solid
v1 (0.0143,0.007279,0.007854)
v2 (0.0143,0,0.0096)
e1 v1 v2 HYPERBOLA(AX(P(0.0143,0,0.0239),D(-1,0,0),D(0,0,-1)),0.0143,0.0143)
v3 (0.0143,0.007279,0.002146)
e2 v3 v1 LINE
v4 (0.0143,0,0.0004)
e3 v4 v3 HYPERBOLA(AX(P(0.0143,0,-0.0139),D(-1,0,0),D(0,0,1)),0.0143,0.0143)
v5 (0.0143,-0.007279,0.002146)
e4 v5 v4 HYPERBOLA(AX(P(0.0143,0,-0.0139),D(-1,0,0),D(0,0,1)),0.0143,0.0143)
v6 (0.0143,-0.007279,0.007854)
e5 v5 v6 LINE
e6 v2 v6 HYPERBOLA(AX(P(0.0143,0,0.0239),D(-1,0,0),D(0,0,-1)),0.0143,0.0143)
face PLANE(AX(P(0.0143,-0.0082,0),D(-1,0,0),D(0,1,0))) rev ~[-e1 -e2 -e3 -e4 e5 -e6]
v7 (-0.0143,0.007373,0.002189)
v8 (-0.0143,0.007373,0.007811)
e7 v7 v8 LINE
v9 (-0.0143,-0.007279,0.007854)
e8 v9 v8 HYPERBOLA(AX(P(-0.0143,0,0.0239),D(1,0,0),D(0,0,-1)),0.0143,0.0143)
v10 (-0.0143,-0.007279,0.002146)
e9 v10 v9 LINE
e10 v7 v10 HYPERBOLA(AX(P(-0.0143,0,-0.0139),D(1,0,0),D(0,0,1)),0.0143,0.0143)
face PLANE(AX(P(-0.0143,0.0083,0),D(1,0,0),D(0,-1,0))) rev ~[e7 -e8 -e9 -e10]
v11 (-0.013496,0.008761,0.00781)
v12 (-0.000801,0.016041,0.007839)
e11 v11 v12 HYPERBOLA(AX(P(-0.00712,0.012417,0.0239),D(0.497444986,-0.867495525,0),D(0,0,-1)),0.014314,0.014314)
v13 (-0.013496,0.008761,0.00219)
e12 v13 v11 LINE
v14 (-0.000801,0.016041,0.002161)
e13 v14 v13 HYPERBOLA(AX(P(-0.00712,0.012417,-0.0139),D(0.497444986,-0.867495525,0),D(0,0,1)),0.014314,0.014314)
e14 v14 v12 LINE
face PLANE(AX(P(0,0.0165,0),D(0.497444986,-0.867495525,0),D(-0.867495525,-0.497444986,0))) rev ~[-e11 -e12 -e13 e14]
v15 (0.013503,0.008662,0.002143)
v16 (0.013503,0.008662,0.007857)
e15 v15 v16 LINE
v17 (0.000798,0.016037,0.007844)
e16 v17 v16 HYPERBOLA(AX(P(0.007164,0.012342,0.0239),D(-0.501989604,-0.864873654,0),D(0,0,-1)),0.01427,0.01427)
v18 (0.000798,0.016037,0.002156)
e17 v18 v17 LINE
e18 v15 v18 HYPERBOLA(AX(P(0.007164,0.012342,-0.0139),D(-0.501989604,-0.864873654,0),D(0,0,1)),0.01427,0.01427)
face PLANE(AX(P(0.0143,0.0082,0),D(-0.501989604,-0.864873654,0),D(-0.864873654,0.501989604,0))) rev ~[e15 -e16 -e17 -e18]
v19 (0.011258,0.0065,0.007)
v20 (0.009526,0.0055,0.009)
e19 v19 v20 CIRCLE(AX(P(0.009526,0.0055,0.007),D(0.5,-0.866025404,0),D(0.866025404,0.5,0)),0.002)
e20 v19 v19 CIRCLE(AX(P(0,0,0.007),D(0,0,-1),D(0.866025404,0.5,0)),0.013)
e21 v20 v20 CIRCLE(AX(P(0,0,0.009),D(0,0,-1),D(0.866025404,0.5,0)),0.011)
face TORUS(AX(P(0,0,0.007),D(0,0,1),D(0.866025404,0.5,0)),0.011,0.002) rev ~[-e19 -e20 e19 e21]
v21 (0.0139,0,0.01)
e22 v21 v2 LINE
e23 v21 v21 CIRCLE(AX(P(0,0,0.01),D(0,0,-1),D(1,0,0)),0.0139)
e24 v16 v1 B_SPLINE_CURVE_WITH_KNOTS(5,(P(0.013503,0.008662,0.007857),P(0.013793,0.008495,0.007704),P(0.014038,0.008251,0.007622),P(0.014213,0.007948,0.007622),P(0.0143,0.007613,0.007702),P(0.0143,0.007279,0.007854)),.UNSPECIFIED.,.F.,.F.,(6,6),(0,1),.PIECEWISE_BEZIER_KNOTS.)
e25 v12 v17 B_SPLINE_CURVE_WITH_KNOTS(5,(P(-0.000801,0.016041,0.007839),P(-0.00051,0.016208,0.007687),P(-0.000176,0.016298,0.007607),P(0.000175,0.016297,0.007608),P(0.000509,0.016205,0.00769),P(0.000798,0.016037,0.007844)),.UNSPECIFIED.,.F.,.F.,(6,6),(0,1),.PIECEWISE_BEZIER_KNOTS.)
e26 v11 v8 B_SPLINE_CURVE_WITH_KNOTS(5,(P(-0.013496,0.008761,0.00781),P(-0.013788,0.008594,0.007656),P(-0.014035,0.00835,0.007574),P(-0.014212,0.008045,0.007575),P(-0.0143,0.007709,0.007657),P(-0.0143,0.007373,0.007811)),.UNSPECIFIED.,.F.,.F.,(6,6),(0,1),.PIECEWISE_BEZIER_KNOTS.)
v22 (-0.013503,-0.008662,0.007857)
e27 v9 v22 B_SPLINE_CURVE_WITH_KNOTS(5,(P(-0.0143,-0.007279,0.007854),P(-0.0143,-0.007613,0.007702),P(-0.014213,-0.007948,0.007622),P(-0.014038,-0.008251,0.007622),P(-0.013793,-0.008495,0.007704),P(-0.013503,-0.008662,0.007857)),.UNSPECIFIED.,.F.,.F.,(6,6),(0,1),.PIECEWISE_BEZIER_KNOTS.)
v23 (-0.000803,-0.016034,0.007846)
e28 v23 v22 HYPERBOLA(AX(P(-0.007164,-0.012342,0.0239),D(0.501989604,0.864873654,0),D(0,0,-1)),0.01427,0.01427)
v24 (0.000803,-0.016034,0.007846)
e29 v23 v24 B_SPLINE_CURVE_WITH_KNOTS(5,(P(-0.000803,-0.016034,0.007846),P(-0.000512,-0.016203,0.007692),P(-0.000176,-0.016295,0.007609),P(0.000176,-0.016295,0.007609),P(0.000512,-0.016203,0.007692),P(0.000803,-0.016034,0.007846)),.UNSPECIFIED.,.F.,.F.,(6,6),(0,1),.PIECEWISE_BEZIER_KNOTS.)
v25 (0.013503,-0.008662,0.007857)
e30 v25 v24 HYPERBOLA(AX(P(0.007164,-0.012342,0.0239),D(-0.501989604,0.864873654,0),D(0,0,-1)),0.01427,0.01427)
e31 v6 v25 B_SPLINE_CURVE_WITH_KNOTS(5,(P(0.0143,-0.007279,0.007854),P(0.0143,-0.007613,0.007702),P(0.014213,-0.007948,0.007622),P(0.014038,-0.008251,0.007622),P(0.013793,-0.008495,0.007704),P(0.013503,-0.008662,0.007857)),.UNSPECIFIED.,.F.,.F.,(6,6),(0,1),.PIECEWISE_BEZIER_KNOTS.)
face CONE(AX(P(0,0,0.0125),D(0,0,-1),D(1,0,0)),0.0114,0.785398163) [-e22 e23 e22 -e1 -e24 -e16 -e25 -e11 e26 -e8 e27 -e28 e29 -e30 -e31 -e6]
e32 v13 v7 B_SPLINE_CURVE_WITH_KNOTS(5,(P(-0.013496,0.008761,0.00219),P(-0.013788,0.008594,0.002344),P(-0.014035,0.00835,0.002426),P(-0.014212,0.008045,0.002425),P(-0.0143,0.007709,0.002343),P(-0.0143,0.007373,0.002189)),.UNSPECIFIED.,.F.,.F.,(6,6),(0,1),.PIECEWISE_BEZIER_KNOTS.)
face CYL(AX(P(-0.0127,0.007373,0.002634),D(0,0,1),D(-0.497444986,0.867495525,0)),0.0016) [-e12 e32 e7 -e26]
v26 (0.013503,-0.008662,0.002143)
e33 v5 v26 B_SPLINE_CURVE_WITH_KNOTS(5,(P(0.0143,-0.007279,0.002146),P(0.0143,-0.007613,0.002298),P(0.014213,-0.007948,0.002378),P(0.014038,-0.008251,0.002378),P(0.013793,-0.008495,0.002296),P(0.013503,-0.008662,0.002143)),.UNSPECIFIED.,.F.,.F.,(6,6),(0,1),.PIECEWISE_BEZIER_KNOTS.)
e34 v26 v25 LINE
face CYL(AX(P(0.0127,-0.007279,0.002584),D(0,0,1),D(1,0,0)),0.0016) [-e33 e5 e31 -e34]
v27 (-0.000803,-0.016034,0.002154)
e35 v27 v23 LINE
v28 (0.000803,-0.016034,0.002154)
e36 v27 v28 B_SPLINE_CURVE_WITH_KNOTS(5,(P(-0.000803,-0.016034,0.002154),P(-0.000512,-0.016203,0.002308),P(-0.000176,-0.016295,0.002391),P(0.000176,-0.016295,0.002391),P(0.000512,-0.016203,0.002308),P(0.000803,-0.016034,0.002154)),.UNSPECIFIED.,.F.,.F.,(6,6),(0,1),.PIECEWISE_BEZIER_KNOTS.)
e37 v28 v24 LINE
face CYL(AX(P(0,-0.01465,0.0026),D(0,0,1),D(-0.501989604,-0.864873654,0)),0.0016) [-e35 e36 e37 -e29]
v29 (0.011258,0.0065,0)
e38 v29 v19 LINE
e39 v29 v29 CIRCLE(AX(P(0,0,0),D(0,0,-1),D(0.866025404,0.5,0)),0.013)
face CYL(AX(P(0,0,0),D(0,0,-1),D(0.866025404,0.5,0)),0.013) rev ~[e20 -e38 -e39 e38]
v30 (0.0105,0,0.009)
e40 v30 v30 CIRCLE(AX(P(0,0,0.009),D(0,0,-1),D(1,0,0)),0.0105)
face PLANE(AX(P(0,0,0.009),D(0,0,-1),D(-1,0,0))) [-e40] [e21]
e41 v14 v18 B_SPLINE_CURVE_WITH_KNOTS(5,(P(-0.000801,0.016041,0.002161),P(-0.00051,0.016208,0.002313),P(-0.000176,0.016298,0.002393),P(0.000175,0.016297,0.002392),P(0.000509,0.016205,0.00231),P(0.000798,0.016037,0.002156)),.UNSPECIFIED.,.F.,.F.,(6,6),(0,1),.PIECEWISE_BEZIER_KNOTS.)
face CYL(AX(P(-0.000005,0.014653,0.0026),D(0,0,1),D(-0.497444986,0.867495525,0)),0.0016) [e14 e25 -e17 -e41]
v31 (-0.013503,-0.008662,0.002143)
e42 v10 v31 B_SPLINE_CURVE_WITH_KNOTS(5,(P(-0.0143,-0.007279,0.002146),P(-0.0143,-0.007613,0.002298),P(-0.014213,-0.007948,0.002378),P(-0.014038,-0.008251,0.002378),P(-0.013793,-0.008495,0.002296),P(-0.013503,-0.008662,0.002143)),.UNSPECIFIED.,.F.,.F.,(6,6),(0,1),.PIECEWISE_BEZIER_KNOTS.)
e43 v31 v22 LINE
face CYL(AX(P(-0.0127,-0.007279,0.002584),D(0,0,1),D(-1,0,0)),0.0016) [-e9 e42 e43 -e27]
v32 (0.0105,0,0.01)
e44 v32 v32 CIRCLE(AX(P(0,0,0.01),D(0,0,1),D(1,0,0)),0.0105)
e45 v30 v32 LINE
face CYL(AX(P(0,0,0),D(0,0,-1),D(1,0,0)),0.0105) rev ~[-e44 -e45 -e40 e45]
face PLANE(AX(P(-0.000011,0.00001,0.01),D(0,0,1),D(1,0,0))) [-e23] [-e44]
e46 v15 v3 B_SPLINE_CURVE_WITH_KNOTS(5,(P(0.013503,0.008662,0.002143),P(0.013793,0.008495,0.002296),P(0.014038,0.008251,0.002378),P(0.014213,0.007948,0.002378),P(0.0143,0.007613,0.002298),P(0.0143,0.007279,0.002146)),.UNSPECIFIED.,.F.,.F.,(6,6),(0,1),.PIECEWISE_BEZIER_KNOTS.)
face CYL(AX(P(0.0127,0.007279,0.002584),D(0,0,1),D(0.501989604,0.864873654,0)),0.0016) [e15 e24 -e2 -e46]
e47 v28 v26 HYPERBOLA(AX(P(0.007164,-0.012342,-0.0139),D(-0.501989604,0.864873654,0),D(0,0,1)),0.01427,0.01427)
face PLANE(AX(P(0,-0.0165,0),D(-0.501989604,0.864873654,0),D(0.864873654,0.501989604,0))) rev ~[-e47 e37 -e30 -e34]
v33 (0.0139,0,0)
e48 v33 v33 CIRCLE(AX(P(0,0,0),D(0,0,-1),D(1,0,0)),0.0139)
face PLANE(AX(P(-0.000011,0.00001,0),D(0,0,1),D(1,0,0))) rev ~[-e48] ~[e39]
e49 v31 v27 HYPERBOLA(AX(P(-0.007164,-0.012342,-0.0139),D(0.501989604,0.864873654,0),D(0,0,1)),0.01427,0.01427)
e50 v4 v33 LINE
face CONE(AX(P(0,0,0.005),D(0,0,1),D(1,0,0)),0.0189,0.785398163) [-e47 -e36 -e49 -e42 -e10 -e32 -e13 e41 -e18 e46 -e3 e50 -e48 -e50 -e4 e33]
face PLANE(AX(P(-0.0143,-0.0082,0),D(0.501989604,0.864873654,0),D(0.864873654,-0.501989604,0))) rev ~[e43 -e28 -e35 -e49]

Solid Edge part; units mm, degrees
sketch "Sketch1" plane through (0, 0, 0) normal (0, 0, 1) x (1, 0, 0)
  circle A0 centre (0, 0) radius 0.0105
  line L0 (0, 0.0165) -> (-0.0143, 0.0083)
  line L1 (-0.0143, 0.0083) -> (-0.0143, -0.0082)
  line L2 (-0.0143, -0.0083) -> (0, -0.0165)
  line L3 (0, -0.0165) -> (0.0143, -0.0082)
  line L4 (0.0143, -0.0082) -> (0.0143, 0.0082)
  line L5 (0.0143, 0.0082) -> (0, 0.0165)
  dimension "D1" = 0.033
  dimension "D2" = 0.021
extrude "Protrusion1" add sketch "Sketch1" along normal blind 0.01
sketch "Sketch2" plane through (0, 0, 0) normal (0, 0, -1) x (0.8660254, 0.5, 0)
  circle A0 centre (0, 0) radius 0.013
  dimension "D1" = 0.026
extrude "Ausschnitt_1" cut sketch "Sketch2" against normal blind 0.009
sketch "Sketch3" plane through (0, 0, 0) normal (0, -1, 0) x (1, 0, 0)
  line L0 (0.0114, 0.0125) -> (0.0189, 0.005)
  line L1 (0.0189, 0.005) -> (0.0114, -0.0025)
  line L2 (0.0214, -0.0025) -> (0.0114, -0.0025)
  line L3 (0.0214, 0.0125) -> (0.0214, -0.0025)
  line L4 (0.0114, 0.0125) -> (0.0214, 0.0125)
  dimension "D1" = 0.01
  dimension "D2" = 0.015
  dimension "D3" = 0.0189
revolve "RevolvedCutout1" cut sketch "Sketch3" angle 360 about axis through (0, 0, 54) along (0, 0, -1)
fillet "Verrundung_1" radius 0.002 6 edges at (0, -0.0165, 0.005) (0.0143, -0.0083, 0.005) (0.0143, 0.0083, 0.005) (-0.0143, -0.0083, 0.005) (0, 0.0165, 0.005) (-0.0143, 0.0083, 0.005)
fillet "Verrundung_2" radius 0.002 1 edges at (-0.0113, -0.0065, 0.009)
